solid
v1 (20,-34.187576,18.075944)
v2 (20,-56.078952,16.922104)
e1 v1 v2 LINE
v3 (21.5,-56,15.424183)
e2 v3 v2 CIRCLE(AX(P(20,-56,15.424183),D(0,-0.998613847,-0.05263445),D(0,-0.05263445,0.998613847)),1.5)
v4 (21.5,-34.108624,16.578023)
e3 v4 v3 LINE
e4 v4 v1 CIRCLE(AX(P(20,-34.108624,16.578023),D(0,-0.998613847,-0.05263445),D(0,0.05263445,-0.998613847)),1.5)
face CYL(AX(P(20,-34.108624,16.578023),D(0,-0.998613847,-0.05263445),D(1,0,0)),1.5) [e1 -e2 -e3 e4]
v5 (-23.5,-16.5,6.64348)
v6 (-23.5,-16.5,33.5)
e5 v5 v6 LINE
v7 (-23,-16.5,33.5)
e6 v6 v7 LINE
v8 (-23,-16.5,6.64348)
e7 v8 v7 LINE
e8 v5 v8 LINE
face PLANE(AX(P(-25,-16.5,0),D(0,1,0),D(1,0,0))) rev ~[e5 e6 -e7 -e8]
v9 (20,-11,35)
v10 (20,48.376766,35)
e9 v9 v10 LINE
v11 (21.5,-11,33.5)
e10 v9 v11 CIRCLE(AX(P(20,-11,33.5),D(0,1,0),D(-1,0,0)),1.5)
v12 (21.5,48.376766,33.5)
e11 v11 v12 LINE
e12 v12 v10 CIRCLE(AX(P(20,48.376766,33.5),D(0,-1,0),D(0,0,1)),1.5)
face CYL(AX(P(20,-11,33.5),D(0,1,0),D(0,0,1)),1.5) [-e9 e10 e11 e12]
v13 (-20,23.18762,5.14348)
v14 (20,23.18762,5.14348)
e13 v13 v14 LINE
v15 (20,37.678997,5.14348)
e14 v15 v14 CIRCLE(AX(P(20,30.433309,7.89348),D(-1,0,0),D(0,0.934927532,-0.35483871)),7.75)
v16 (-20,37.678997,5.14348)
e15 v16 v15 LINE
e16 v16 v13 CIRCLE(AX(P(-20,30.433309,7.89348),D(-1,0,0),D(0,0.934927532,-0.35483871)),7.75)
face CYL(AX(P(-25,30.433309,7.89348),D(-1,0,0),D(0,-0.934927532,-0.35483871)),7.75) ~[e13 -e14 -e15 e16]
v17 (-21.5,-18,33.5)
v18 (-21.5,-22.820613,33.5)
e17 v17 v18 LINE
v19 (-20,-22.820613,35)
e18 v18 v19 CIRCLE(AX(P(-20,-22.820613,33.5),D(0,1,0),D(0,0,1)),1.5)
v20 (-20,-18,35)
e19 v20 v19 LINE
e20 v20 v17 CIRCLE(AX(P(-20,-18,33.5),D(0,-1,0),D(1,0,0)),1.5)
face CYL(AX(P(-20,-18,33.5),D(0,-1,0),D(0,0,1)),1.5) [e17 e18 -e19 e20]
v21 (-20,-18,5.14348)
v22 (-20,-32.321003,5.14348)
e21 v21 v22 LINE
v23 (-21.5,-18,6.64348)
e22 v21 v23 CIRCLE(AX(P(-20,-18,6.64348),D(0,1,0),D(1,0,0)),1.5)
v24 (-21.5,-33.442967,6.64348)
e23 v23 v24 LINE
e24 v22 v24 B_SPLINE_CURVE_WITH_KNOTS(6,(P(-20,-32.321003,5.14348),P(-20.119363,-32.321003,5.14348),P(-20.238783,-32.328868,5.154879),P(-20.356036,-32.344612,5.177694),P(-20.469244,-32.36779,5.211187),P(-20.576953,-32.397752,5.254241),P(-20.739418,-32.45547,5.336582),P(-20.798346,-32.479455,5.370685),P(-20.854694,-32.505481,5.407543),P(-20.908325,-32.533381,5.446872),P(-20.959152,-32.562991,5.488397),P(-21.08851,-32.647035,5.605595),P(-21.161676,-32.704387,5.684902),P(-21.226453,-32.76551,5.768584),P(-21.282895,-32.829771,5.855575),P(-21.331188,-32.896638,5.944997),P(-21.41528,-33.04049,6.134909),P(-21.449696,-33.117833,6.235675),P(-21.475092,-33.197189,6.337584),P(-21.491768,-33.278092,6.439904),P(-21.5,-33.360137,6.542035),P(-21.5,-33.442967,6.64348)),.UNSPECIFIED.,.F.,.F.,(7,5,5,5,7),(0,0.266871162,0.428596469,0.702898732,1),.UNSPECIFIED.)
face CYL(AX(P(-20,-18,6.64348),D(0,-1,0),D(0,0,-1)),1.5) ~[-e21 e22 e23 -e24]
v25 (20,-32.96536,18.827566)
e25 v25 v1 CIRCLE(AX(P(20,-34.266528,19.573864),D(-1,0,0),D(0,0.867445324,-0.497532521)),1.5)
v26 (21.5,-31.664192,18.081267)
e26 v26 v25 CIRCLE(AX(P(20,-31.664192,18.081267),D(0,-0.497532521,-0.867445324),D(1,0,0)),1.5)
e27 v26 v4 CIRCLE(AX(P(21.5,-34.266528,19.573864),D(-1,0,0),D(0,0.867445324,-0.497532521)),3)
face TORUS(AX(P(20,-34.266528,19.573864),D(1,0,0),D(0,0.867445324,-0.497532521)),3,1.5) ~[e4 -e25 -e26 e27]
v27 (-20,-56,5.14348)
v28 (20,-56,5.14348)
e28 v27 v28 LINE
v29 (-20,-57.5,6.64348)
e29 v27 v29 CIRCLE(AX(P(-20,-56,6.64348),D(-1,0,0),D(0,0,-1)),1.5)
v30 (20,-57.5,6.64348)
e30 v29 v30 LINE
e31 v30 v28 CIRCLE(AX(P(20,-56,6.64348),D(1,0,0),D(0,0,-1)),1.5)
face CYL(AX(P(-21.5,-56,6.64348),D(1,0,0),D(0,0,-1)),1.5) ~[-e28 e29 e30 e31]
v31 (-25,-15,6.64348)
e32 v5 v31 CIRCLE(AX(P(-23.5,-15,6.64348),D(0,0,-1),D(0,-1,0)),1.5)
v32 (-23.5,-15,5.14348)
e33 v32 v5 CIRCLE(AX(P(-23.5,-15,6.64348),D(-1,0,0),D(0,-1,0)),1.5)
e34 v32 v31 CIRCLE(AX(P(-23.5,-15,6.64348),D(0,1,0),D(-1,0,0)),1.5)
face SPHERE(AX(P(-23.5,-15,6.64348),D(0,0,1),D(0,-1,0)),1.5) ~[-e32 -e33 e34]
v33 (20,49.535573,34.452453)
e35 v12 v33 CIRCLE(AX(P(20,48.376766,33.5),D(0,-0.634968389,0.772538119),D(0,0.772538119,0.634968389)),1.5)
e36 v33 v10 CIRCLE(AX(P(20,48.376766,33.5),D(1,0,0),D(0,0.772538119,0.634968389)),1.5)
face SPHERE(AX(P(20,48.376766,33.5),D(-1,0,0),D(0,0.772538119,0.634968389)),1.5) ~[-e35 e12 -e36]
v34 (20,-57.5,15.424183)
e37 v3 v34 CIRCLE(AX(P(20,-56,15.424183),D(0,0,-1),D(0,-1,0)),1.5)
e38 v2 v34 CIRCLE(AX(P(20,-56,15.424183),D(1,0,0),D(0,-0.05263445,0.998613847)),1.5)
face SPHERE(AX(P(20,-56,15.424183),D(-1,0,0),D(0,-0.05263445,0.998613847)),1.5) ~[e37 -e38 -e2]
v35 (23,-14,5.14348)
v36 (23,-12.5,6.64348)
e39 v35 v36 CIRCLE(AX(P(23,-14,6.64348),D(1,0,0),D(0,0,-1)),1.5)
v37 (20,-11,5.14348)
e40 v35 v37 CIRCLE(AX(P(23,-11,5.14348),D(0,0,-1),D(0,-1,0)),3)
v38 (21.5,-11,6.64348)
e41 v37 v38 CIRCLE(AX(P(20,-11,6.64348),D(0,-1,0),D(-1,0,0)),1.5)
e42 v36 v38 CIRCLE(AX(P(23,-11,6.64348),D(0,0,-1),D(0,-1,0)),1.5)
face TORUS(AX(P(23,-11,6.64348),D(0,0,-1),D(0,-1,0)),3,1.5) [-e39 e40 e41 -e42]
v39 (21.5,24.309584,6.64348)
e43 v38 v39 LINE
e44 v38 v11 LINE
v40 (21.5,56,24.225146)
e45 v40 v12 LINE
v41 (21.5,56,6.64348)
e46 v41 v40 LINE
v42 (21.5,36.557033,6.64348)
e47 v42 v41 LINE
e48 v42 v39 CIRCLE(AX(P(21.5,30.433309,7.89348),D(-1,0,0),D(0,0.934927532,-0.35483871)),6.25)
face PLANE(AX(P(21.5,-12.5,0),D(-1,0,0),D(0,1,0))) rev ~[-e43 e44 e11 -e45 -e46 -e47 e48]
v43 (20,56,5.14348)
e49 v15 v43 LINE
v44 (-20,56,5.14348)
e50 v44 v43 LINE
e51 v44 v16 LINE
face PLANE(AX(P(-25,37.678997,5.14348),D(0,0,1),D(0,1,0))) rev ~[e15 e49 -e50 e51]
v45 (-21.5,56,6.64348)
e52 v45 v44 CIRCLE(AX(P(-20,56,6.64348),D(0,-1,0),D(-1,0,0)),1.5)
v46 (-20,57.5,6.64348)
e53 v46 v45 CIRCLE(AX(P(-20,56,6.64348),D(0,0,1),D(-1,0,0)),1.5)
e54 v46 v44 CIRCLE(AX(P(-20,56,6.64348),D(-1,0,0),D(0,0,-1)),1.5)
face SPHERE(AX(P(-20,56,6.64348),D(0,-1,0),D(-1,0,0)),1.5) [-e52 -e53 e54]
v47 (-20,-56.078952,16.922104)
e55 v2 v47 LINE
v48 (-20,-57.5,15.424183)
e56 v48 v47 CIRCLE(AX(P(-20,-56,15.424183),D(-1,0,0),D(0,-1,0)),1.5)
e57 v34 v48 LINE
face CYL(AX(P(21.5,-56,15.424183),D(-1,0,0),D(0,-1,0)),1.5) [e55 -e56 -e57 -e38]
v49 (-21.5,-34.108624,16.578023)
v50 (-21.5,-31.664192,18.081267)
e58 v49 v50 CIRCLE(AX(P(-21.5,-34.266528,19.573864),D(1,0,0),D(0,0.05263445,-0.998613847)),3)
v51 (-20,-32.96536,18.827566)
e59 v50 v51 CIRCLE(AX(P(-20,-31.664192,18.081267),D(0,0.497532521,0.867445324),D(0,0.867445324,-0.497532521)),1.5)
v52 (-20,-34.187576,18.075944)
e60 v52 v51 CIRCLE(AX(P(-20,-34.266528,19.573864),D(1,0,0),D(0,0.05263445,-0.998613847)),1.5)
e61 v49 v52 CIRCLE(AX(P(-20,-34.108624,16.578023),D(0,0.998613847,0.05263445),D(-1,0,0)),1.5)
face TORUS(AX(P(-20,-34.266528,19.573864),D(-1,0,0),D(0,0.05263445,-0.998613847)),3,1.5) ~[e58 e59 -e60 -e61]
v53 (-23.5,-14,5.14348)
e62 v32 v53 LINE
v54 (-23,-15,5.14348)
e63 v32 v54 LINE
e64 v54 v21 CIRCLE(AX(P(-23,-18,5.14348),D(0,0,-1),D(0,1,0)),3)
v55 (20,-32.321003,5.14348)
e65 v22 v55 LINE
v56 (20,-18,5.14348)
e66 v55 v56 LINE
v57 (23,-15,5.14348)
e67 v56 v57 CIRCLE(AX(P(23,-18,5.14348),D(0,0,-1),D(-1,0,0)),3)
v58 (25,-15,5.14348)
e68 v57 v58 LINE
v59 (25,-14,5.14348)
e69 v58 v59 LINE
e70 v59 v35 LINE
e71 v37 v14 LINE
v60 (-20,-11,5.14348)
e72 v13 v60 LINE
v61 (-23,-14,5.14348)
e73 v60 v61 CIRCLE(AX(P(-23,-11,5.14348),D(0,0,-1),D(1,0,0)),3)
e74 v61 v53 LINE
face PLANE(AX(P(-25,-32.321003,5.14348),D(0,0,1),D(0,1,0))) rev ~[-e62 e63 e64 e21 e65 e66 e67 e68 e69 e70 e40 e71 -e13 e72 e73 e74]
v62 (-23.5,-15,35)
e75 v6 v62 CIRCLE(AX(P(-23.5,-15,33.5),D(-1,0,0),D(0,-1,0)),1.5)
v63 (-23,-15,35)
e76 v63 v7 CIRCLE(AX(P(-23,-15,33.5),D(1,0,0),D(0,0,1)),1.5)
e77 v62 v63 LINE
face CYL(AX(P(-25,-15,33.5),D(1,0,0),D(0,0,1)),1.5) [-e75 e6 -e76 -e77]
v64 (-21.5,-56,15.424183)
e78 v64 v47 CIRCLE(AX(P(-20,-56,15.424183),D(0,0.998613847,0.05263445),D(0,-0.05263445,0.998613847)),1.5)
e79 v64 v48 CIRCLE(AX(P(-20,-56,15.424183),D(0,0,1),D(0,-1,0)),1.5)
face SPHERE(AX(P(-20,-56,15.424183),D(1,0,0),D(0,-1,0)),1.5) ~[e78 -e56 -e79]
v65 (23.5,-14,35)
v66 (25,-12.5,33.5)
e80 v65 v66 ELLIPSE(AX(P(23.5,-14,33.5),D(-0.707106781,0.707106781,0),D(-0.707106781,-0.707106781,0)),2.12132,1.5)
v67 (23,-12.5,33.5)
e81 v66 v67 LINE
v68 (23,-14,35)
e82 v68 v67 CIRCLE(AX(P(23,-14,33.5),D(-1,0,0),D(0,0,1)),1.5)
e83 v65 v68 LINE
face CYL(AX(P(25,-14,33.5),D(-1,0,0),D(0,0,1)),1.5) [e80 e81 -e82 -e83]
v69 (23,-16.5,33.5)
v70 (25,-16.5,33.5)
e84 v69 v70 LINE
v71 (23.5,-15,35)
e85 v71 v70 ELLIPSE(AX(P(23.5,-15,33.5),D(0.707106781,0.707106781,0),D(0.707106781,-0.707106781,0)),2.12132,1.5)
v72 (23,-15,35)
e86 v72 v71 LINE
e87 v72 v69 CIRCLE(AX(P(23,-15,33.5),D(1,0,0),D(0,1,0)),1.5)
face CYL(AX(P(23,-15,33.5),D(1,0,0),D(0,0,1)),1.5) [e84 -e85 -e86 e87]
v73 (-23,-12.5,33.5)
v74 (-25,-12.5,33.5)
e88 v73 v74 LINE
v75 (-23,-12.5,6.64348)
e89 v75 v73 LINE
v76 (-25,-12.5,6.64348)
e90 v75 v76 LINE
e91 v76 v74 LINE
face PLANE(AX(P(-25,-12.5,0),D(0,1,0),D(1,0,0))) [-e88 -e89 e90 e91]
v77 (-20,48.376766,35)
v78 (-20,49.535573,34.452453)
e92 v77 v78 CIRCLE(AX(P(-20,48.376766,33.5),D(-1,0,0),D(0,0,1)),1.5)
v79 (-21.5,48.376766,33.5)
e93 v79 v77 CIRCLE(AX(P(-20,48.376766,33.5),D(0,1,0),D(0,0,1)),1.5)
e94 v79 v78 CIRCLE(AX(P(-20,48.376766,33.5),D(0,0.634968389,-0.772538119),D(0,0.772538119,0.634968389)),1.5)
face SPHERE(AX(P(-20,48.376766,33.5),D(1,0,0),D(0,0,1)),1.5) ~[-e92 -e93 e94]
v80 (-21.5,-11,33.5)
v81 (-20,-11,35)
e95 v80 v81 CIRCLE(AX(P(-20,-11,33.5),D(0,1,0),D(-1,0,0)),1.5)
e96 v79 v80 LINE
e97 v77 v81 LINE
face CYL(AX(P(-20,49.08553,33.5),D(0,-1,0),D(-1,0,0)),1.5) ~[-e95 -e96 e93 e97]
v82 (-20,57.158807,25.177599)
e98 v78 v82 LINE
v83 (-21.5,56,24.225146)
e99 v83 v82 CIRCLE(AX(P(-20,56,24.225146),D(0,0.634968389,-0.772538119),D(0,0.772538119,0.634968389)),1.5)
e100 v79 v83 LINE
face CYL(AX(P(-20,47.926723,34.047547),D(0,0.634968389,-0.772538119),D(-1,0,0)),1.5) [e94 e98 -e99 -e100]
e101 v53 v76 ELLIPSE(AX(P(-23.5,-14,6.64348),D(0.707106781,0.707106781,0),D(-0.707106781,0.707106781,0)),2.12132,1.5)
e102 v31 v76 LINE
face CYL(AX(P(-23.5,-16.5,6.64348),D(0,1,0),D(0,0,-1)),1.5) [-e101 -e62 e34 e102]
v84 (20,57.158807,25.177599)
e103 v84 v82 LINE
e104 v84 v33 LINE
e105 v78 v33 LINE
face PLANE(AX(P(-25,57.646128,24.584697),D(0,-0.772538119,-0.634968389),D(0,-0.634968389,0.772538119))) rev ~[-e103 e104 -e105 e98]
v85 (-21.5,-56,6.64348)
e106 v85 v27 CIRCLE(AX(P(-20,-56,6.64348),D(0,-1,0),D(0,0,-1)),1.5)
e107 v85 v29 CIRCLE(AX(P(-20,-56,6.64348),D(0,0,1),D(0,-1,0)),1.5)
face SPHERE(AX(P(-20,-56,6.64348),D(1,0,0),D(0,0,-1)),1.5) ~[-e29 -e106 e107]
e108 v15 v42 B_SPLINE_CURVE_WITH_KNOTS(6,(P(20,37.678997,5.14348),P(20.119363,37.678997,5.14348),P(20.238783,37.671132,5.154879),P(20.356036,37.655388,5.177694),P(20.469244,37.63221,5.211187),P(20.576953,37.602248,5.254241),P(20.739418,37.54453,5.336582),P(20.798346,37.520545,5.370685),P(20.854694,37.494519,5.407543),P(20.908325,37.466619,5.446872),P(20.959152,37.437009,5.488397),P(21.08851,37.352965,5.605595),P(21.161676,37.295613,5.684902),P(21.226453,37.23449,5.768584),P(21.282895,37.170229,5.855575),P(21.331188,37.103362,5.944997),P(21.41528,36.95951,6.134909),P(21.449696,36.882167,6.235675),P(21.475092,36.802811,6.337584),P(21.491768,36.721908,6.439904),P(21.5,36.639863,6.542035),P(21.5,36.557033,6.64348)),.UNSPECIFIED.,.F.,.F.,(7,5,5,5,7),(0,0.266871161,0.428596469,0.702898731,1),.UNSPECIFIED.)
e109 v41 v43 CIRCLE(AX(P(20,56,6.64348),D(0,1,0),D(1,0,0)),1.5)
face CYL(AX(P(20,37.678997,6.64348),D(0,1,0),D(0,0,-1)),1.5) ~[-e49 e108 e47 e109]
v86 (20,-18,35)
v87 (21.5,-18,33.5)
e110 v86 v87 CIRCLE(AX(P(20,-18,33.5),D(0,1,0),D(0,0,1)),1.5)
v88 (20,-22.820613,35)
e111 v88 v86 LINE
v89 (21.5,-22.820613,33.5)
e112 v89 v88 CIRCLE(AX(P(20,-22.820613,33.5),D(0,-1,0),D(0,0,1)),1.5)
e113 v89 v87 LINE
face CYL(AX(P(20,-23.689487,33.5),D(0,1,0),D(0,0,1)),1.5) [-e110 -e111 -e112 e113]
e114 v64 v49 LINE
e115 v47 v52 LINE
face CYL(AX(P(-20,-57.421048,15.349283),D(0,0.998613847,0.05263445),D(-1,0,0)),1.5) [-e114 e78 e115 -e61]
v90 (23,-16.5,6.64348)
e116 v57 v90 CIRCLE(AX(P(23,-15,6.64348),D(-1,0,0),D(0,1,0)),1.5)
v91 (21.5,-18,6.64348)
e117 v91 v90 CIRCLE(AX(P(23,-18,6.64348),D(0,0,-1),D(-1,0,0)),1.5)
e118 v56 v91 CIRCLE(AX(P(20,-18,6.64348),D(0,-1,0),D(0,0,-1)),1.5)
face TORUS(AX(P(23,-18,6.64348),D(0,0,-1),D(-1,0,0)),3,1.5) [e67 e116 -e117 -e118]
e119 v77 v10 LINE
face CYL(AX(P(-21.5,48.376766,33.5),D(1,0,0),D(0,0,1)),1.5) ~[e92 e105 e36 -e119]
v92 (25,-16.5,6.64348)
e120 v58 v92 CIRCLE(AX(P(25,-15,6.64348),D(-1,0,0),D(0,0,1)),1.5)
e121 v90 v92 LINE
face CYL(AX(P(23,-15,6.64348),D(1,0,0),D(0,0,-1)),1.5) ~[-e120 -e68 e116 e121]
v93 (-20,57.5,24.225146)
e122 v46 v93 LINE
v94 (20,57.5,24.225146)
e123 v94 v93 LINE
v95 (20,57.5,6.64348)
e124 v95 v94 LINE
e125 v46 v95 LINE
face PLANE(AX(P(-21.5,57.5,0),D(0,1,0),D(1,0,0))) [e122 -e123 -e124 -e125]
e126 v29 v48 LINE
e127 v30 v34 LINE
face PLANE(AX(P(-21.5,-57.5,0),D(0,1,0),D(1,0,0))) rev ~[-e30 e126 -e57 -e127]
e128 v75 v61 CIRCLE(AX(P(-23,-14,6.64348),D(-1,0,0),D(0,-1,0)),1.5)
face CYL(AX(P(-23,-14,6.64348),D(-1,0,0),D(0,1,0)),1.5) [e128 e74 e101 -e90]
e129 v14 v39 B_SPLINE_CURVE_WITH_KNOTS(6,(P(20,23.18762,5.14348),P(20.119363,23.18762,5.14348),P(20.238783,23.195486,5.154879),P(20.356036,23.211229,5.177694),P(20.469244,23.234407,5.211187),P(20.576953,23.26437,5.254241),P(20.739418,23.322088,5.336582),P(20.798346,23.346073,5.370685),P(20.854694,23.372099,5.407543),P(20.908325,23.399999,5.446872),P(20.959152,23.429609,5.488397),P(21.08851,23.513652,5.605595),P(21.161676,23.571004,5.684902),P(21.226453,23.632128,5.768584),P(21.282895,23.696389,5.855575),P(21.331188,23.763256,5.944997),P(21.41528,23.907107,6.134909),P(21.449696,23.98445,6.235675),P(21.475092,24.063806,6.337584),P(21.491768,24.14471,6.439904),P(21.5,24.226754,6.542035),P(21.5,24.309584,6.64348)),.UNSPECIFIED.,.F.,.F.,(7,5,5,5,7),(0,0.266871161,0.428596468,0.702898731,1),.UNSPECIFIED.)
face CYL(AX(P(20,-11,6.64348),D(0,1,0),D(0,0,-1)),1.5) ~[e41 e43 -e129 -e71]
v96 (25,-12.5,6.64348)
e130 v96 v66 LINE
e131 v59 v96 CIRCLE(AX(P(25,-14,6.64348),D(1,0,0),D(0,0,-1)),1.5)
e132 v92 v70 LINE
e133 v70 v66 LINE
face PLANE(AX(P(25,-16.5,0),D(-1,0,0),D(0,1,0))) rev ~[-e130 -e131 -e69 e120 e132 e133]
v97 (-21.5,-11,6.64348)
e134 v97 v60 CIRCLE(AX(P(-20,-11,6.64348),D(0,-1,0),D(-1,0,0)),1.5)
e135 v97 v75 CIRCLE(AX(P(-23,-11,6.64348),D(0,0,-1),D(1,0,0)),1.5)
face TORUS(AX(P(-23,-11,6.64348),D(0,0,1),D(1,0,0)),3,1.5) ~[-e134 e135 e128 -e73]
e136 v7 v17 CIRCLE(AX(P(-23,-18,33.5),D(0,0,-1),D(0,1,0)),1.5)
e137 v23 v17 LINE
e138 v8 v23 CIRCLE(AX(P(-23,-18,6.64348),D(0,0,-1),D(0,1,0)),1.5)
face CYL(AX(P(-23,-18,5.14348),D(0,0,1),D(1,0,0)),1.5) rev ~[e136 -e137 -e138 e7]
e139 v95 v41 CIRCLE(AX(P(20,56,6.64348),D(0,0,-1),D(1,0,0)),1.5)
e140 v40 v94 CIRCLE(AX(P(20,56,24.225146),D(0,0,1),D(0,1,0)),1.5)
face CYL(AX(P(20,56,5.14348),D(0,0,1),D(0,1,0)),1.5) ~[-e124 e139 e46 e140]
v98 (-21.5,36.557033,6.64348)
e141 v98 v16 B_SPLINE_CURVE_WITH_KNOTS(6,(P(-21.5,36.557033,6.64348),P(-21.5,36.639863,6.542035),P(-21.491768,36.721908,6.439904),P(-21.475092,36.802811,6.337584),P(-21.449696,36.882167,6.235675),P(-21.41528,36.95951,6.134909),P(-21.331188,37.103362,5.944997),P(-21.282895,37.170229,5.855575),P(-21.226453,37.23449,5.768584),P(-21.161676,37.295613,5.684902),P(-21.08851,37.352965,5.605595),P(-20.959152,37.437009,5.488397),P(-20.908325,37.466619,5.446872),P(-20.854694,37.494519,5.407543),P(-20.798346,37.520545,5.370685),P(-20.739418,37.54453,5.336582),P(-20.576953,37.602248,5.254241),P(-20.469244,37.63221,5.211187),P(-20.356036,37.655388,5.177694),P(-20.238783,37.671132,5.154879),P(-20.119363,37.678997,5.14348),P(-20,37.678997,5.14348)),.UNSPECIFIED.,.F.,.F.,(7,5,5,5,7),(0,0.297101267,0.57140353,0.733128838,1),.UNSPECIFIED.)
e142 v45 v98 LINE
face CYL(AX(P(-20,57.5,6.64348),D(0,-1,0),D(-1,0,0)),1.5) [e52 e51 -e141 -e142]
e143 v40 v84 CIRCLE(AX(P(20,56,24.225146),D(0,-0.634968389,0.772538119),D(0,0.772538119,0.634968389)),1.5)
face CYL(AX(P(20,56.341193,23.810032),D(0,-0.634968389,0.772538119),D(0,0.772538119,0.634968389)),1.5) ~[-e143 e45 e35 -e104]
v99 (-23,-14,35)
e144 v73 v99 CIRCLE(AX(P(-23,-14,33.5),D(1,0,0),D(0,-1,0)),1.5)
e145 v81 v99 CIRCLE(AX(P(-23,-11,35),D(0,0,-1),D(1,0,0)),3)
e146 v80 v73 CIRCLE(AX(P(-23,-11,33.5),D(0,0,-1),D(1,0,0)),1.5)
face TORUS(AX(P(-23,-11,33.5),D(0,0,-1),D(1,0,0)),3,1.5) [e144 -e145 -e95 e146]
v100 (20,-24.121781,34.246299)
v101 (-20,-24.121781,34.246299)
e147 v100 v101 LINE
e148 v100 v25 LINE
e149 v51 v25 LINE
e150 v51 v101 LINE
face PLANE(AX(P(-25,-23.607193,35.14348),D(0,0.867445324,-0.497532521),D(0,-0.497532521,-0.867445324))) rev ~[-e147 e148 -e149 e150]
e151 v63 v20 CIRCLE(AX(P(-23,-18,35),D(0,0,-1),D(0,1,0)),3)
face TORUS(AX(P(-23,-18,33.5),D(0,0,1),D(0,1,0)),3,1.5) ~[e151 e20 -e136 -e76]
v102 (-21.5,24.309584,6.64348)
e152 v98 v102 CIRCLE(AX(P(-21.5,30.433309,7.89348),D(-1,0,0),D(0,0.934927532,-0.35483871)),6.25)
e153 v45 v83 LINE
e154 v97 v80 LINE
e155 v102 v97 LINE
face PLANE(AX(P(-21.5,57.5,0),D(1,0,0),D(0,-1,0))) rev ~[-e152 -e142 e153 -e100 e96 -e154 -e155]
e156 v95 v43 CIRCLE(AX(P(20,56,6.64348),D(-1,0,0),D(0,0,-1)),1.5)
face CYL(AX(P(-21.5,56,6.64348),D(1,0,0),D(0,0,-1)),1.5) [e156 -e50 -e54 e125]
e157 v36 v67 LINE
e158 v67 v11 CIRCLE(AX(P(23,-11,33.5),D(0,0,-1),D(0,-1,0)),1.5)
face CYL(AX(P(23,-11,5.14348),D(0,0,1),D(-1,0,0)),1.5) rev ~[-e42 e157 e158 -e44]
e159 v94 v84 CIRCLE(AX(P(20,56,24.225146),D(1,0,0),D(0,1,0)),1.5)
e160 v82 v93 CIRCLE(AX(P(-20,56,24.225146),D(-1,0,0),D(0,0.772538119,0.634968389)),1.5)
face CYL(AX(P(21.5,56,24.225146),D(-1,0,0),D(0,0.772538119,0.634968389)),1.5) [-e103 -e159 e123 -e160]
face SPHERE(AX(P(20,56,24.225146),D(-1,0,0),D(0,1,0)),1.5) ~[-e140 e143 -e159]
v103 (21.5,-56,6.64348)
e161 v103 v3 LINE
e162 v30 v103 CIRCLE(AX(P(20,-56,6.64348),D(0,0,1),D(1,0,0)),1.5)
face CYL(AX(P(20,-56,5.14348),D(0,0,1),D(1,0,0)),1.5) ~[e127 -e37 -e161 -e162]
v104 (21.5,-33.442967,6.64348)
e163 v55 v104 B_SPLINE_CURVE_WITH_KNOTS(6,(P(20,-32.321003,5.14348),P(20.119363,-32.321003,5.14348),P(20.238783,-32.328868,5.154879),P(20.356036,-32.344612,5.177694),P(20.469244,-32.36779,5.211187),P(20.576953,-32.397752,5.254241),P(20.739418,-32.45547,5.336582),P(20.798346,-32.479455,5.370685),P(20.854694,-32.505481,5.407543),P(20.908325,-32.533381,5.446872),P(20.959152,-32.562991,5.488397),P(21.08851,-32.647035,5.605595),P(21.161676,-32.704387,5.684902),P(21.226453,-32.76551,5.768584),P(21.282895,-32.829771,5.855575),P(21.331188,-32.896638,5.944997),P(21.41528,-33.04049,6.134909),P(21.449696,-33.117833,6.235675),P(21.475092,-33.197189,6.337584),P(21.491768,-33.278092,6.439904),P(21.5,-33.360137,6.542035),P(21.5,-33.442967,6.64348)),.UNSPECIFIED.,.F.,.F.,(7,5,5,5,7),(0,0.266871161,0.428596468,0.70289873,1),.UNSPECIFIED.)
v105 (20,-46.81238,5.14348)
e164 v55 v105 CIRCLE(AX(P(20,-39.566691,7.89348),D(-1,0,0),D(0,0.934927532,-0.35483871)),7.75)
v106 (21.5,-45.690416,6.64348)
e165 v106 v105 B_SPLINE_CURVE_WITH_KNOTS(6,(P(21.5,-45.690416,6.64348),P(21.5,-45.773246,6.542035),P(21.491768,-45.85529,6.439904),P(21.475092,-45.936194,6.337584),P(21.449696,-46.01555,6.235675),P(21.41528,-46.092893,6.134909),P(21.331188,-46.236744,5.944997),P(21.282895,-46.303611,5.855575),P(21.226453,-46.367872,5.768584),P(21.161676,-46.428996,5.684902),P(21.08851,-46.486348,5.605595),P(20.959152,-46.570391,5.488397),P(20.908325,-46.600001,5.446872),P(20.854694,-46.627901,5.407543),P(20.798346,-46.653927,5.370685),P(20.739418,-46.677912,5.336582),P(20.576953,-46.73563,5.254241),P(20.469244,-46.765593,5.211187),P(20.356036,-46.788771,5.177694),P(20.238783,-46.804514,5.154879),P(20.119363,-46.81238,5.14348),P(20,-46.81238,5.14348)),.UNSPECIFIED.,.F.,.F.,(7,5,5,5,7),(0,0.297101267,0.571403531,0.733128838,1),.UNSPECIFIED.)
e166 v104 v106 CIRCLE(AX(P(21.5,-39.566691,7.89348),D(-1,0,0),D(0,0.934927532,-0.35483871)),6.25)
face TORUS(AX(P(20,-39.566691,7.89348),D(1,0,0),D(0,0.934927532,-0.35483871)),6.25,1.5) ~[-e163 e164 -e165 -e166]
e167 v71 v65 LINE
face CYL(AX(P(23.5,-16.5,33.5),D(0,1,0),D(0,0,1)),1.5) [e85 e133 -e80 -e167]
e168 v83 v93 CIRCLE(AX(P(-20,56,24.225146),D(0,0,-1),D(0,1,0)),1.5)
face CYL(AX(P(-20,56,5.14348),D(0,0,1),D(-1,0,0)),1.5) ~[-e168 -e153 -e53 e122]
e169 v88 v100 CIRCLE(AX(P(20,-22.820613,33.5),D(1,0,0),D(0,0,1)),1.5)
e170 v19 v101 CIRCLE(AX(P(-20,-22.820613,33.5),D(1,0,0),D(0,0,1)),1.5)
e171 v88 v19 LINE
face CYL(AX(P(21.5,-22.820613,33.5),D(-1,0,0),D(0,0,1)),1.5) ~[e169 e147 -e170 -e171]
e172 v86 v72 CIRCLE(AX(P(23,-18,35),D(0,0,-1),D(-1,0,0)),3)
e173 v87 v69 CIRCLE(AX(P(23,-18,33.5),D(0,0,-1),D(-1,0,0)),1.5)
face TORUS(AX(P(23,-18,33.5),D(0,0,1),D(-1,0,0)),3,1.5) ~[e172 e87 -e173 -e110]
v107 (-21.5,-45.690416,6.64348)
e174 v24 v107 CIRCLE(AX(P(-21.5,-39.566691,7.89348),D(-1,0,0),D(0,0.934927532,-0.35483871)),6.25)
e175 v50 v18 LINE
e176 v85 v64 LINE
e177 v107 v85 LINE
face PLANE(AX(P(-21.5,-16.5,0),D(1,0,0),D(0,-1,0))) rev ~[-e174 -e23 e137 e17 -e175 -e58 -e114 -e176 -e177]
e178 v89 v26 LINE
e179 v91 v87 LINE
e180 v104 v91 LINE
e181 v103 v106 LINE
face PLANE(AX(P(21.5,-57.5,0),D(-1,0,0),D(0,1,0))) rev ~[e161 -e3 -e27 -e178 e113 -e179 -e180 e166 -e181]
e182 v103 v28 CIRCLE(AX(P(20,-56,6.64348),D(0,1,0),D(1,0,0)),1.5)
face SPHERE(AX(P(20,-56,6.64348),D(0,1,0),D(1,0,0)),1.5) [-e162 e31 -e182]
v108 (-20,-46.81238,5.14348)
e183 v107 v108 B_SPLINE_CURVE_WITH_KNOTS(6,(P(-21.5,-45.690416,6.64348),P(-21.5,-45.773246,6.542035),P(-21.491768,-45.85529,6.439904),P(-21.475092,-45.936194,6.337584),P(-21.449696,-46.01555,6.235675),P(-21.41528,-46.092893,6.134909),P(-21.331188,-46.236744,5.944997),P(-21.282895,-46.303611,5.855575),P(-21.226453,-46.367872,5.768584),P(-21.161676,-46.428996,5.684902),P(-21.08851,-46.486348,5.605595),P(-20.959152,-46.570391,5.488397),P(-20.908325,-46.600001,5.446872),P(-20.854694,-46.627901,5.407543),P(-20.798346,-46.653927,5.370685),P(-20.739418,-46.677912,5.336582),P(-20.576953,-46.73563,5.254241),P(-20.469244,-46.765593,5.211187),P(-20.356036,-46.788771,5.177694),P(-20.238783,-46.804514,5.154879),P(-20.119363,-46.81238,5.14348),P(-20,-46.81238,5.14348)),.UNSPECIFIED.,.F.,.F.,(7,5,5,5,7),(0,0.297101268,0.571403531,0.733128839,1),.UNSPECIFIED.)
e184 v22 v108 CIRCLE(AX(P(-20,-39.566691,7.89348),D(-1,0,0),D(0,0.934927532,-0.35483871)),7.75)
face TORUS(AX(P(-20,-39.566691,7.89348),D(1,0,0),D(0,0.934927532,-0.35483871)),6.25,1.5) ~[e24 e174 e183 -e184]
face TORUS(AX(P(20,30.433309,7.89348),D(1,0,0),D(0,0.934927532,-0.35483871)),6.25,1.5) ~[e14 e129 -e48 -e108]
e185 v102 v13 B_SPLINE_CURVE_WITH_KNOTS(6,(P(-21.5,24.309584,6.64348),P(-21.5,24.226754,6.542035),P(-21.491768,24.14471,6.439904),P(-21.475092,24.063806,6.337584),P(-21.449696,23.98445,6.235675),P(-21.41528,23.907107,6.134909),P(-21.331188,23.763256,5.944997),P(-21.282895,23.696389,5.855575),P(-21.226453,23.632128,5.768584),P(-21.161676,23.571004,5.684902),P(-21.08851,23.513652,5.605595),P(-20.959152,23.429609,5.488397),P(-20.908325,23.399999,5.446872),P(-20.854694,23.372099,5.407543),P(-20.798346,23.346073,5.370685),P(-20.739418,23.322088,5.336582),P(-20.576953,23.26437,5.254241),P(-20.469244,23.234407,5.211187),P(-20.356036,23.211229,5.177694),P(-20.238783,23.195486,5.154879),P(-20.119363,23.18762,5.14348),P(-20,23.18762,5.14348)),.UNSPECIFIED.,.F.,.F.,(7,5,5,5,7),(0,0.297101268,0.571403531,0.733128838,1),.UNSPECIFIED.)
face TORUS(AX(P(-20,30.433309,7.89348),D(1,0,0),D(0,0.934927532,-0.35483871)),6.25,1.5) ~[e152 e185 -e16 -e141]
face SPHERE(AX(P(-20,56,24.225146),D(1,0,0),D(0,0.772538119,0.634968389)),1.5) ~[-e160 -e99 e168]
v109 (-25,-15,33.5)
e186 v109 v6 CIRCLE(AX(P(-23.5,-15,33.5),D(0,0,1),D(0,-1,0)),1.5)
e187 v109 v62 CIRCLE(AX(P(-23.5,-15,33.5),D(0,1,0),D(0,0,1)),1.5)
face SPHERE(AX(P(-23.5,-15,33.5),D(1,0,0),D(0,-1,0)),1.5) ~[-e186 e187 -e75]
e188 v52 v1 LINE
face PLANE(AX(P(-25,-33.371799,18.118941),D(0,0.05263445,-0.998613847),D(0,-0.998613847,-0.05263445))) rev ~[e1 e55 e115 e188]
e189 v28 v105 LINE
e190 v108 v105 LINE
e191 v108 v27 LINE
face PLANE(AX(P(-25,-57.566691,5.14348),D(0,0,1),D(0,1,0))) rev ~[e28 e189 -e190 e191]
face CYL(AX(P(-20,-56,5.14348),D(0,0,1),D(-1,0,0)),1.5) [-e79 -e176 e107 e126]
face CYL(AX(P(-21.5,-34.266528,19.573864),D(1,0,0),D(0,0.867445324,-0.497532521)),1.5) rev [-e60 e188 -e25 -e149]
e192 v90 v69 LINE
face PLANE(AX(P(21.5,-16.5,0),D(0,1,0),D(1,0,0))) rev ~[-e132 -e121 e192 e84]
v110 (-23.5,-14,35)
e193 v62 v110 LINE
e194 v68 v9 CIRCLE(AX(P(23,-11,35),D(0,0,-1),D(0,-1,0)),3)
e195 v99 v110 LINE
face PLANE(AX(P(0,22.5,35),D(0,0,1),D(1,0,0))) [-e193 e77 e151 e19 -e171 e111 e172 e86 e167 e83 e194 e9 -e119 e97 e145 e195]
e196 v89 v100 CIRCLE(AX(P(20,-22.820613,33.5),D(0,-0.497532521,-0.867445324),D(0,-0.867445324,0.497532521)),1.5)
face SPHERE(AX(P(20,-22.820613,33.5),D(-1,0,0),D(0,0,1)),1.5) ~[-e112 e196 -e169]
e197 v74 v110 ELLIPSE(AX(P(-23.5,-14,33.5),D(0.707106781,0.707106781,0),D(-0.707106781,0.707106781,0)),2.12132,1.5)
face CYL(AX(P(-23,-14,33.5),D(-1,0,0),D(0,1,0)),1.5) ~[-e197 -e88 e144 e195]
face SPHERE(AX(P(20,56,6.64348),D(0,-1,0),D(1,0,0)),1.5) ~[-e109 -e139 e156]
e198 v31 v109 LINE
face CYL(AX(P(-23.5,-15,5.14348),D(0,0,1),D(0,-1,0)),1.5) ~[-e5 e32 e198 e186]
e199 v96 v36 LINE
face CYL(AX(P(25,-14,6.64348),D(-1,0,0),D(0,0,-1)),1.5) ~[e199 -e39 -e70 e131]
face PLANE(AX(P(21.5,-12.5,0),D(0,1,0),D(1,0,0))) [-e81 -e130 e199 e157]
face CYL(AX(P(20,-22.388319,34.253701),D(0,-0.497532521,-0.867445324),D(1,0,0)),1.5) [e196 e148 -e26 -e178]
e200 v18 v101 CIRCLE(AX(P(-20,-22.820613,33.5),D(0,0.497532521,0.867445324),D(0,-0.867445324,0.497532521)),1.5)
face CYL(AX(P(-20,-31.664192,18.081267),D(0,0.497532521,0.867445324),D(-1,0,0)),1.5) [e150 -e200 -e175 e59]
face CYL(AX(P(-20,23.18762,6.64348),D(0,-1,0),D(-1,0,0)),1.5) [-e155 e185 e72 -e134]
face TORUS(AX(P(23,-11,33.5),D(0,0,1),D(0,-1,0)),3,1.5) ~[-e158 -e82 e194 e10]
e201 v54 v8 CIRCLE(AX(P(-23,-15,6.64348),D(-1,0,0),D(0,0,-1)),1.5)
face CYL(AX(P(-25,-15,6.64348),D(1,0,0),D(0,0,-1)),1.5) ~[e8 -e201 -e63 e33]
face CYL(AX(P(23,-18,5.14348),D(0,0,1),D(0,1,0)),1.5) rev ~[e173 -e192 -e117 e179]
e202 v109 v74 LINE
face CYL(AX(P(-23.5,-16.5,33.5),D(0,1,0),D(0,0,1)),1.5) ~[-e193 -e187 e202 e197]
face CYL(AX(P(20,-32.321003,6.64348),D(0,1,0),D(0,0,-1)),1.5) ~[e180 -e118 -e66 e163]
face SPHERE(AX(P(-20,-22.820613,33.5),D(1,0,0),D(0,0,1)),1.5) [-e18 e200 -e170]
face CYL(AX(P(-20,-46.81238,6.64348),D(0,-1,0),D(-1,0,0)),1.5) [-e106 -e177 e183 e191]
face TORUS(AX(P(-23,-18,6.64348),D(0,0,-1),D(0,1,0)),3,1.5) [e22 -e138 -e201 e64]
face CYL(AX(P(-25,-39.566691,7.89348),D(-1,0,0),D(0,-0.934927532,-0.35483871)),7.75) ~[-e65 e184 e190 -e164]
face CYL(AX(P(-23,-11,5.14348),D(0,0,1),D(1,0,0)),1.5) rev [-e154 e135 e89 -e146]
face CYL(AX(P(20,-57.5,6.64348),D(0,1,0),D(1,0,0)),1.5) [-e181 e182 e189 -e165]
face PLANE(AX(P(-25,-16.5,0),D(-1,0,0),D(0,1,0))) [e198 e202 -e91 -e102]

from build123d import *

# Parameters (mm, degrees)
F0_W     = 43
F0_H     = 70
F0_H_2   = 41
F0_H_3   = 4
F0_W_2   = 3.5
F1_DEPTH = 35
F2_W     = 133.2405284047
F2_H     = 49.6386280283
F2_W_2   = 4
F2_H_2   = 5.1434804872
F3_DEPTH = 71.3
F4_F1_R  = 1.5
F4_F2_R  = 1.5


with BuildPart() as f1:
    # F0 (on Top) → F1 (new body)
    with BuildSketch(Plane.XY):
        with Locations((0, 22.5)):
            Rectangle(F0_W, F0_H)
        with Locations((0, -37)):
            Rectangle(F0_W, F0_H_2)
        with Locations((0, -14.5)):
            Rectangle(F0_W, F0_H_3)
        with Locations((-23.25, -14.5)):
            Rectangle(F0_W_2, F0_H_3)
        with Locations((23.25, -14.5)):
            Rectangle(F0_W_2, F0_H_3)
    extrude(amount=F1_DEPTH)

    # F2 (on face) → F3 (cut)
    with BuildSketch(Plane(origin=(-25, 0, 0), x_dir=(0, -1, 0), z_dir=(-1, 0, 0))):
        with Locations((2.746347338, 15.9121430479)):
            Rectangle(F2_W, F2_H)
        with BuildLine():
            Line((-37.6789971831, 5.1434804872), (-57.6461282372, 5.1434804872))
            Line((-57.6461282372, 5.1434804872), (-57.6461282372, 24.5846966282))
            Line((-57.6461282372, 24.5846966282), (-48.9675998688, 35.1434804872))
            Line((-48.9675998688, 35.1434804872), (23.607192561, 35.1434804872))
            Line((23.607192561, 35.1434804872), (33.3717986941, 18.1189412251))
            Line((33.3717986941, 18.1189412251), (57.56669119, 16.8436886743))
            Line((57.56669119, 16.8436886743), (57.56669119, 5.1434804872))
            Line((57.56669119, 5.1434804872), (46.8123795631, 5.1434804872))
            ThreePointArc((46.8123795631, 5.1434804872), (39.56669119, 0.1434804872), (32.3210028169, 5.1434804872))
            Line((32.3210028169, 5.1434804872), (16.5, 5.1434804872))
            Line((16.5, 5.1434804872), (16.5, 0))
            Line((16.5, 0), (12.5, 0))
            Line((12.5, 0), (12.5, 5.1434804872))
            Line((12.5, 5.1434804872), (-23.1876204369, 5.1434804872))
            ThreePointArc((-23.1876204369, 5.1434804872), (-30.43330881, 0.1434804872), (-37.6789971831, 5.1434804872))
        make_face(mode=Mode.SUBTRACT)
        with Locations((14.5, 2.5717402436)):
            Rectangle(F2_W_2, F2_H_2)
    extrude(amount=-F3_DEPTH, mode=Mode.SUBTRACT)

    # F4: fillet of radius 1.5 on 46 edges, made by hand

    # F4_f1
    f4_f1_edges = [f1.edges().sort_by_distance(p)[0] for p in [
        (0, -33.3717986941, 18.1189412251),
        (21.5, -16.5, 20.0717402436),
        (-21.5, -16.5, 20.0717402436),
        (-21.5, -12.5, 20.0717402436),
        (21.5, -12.5, 20.0717402436),
    ]]
    fillet(f4_f1_edges, radius=F4_F1_R)

    # F4_f2
    f4_f2_edges = [f1.edges().sort_by_distance(p)[0] for p in [
        (-21.5, 19.0427650337, 35),
        (-21.5, -28.3274234666, 26.9137828136),
        (0, -23.6894873253, 35),
        (-21.5, -20.8447436626, 35),
        (0, -57.5, 16.8472038009),
        (21.5, -52.1561897815, 5.1434804872),
        (21.5, -39.56669119, 0.1434804872),
        (21.5, -25.1605014085, 5.1434804872),
        (21.5, -20.8447436626, 35),
        (21.5, -28.3274234666, 26.9137828136),
        (21.5, -45.8437879598, 17.4615737196),
        (21.5, -57.5, 10.995342144),
        (0, -57.5, 5.1434804872),
        (-24, -16.5, 35),
        (-25, -16.5, 20.0717402436),
        (-24, -16.5, 5.1434804872),
        (-25, -14.5, 5.1434804872),
        (-21.5, 47.5894985915, 5.1434804872),
        (-21.5, 30.43330881, 0.1434804872),
        (-21.5, 6.0938102185, 5.1434804872),
        (-21.5, 53.2927650337, 29.8812422145),
        (-21.5, 57.5, 14.9529824581),
        (21.5, 19.0427650337, 35),
        (24, -12.5, 35),
        (25, -14.5, 35),
        (24, -16.5, 35),
        (-25, -14.5, 35),
        (-24, -12.5, 35),
        (0, 49.0855300674, 35),
        (21.5, 6.0938102185, 5.1434804872),
        (21.5, 30.43330881, 0.1434804872),
        (21.5, 47.5894985915, 5.1434804872),
        (21.5, 57.5, 14.9529824581),
        (21.5, 53.2927650337, 29.8812422145),
        (0, 57.5, 24.762484429),
        (0, 57.5, 5.1434804872),
        (-21.5, -25.1605014085, 5.1434804872),
        (-21.5, -39.56669119, 0.1434804872),
        (-21.5, -52.1561897815, 5.1434804872),
        (-21.5, -57.5, 10.995342144),
        (-21.5, -45.8437879598, 17.4615737196),
        (-21.5, -33.4807690606, 18.2961384884),
        (-21.9393398282, -16.9393398282, 5.1434804872),
        (21.9393398282, -12.0606601718, 5.1434804872),
        (-21.9393398282, -12.0606601718, 35),
        (21.9393398282, -16.9393398282, 35),
        (21.9393398282, -12.0606601718, 35),
        (-21.9393398282, -12.0606601718, 5.1434804872),
        (-21.9393398282, -16.9393398282, 35),
        (21.5, -33.4807690606, 18.2961384884),
        (21.9393398282, -16.9393398282, 5.1434804872),
    ]]
    fillet(f4_f2_edges, radius=F4_F2_R)


solid = f1.part
